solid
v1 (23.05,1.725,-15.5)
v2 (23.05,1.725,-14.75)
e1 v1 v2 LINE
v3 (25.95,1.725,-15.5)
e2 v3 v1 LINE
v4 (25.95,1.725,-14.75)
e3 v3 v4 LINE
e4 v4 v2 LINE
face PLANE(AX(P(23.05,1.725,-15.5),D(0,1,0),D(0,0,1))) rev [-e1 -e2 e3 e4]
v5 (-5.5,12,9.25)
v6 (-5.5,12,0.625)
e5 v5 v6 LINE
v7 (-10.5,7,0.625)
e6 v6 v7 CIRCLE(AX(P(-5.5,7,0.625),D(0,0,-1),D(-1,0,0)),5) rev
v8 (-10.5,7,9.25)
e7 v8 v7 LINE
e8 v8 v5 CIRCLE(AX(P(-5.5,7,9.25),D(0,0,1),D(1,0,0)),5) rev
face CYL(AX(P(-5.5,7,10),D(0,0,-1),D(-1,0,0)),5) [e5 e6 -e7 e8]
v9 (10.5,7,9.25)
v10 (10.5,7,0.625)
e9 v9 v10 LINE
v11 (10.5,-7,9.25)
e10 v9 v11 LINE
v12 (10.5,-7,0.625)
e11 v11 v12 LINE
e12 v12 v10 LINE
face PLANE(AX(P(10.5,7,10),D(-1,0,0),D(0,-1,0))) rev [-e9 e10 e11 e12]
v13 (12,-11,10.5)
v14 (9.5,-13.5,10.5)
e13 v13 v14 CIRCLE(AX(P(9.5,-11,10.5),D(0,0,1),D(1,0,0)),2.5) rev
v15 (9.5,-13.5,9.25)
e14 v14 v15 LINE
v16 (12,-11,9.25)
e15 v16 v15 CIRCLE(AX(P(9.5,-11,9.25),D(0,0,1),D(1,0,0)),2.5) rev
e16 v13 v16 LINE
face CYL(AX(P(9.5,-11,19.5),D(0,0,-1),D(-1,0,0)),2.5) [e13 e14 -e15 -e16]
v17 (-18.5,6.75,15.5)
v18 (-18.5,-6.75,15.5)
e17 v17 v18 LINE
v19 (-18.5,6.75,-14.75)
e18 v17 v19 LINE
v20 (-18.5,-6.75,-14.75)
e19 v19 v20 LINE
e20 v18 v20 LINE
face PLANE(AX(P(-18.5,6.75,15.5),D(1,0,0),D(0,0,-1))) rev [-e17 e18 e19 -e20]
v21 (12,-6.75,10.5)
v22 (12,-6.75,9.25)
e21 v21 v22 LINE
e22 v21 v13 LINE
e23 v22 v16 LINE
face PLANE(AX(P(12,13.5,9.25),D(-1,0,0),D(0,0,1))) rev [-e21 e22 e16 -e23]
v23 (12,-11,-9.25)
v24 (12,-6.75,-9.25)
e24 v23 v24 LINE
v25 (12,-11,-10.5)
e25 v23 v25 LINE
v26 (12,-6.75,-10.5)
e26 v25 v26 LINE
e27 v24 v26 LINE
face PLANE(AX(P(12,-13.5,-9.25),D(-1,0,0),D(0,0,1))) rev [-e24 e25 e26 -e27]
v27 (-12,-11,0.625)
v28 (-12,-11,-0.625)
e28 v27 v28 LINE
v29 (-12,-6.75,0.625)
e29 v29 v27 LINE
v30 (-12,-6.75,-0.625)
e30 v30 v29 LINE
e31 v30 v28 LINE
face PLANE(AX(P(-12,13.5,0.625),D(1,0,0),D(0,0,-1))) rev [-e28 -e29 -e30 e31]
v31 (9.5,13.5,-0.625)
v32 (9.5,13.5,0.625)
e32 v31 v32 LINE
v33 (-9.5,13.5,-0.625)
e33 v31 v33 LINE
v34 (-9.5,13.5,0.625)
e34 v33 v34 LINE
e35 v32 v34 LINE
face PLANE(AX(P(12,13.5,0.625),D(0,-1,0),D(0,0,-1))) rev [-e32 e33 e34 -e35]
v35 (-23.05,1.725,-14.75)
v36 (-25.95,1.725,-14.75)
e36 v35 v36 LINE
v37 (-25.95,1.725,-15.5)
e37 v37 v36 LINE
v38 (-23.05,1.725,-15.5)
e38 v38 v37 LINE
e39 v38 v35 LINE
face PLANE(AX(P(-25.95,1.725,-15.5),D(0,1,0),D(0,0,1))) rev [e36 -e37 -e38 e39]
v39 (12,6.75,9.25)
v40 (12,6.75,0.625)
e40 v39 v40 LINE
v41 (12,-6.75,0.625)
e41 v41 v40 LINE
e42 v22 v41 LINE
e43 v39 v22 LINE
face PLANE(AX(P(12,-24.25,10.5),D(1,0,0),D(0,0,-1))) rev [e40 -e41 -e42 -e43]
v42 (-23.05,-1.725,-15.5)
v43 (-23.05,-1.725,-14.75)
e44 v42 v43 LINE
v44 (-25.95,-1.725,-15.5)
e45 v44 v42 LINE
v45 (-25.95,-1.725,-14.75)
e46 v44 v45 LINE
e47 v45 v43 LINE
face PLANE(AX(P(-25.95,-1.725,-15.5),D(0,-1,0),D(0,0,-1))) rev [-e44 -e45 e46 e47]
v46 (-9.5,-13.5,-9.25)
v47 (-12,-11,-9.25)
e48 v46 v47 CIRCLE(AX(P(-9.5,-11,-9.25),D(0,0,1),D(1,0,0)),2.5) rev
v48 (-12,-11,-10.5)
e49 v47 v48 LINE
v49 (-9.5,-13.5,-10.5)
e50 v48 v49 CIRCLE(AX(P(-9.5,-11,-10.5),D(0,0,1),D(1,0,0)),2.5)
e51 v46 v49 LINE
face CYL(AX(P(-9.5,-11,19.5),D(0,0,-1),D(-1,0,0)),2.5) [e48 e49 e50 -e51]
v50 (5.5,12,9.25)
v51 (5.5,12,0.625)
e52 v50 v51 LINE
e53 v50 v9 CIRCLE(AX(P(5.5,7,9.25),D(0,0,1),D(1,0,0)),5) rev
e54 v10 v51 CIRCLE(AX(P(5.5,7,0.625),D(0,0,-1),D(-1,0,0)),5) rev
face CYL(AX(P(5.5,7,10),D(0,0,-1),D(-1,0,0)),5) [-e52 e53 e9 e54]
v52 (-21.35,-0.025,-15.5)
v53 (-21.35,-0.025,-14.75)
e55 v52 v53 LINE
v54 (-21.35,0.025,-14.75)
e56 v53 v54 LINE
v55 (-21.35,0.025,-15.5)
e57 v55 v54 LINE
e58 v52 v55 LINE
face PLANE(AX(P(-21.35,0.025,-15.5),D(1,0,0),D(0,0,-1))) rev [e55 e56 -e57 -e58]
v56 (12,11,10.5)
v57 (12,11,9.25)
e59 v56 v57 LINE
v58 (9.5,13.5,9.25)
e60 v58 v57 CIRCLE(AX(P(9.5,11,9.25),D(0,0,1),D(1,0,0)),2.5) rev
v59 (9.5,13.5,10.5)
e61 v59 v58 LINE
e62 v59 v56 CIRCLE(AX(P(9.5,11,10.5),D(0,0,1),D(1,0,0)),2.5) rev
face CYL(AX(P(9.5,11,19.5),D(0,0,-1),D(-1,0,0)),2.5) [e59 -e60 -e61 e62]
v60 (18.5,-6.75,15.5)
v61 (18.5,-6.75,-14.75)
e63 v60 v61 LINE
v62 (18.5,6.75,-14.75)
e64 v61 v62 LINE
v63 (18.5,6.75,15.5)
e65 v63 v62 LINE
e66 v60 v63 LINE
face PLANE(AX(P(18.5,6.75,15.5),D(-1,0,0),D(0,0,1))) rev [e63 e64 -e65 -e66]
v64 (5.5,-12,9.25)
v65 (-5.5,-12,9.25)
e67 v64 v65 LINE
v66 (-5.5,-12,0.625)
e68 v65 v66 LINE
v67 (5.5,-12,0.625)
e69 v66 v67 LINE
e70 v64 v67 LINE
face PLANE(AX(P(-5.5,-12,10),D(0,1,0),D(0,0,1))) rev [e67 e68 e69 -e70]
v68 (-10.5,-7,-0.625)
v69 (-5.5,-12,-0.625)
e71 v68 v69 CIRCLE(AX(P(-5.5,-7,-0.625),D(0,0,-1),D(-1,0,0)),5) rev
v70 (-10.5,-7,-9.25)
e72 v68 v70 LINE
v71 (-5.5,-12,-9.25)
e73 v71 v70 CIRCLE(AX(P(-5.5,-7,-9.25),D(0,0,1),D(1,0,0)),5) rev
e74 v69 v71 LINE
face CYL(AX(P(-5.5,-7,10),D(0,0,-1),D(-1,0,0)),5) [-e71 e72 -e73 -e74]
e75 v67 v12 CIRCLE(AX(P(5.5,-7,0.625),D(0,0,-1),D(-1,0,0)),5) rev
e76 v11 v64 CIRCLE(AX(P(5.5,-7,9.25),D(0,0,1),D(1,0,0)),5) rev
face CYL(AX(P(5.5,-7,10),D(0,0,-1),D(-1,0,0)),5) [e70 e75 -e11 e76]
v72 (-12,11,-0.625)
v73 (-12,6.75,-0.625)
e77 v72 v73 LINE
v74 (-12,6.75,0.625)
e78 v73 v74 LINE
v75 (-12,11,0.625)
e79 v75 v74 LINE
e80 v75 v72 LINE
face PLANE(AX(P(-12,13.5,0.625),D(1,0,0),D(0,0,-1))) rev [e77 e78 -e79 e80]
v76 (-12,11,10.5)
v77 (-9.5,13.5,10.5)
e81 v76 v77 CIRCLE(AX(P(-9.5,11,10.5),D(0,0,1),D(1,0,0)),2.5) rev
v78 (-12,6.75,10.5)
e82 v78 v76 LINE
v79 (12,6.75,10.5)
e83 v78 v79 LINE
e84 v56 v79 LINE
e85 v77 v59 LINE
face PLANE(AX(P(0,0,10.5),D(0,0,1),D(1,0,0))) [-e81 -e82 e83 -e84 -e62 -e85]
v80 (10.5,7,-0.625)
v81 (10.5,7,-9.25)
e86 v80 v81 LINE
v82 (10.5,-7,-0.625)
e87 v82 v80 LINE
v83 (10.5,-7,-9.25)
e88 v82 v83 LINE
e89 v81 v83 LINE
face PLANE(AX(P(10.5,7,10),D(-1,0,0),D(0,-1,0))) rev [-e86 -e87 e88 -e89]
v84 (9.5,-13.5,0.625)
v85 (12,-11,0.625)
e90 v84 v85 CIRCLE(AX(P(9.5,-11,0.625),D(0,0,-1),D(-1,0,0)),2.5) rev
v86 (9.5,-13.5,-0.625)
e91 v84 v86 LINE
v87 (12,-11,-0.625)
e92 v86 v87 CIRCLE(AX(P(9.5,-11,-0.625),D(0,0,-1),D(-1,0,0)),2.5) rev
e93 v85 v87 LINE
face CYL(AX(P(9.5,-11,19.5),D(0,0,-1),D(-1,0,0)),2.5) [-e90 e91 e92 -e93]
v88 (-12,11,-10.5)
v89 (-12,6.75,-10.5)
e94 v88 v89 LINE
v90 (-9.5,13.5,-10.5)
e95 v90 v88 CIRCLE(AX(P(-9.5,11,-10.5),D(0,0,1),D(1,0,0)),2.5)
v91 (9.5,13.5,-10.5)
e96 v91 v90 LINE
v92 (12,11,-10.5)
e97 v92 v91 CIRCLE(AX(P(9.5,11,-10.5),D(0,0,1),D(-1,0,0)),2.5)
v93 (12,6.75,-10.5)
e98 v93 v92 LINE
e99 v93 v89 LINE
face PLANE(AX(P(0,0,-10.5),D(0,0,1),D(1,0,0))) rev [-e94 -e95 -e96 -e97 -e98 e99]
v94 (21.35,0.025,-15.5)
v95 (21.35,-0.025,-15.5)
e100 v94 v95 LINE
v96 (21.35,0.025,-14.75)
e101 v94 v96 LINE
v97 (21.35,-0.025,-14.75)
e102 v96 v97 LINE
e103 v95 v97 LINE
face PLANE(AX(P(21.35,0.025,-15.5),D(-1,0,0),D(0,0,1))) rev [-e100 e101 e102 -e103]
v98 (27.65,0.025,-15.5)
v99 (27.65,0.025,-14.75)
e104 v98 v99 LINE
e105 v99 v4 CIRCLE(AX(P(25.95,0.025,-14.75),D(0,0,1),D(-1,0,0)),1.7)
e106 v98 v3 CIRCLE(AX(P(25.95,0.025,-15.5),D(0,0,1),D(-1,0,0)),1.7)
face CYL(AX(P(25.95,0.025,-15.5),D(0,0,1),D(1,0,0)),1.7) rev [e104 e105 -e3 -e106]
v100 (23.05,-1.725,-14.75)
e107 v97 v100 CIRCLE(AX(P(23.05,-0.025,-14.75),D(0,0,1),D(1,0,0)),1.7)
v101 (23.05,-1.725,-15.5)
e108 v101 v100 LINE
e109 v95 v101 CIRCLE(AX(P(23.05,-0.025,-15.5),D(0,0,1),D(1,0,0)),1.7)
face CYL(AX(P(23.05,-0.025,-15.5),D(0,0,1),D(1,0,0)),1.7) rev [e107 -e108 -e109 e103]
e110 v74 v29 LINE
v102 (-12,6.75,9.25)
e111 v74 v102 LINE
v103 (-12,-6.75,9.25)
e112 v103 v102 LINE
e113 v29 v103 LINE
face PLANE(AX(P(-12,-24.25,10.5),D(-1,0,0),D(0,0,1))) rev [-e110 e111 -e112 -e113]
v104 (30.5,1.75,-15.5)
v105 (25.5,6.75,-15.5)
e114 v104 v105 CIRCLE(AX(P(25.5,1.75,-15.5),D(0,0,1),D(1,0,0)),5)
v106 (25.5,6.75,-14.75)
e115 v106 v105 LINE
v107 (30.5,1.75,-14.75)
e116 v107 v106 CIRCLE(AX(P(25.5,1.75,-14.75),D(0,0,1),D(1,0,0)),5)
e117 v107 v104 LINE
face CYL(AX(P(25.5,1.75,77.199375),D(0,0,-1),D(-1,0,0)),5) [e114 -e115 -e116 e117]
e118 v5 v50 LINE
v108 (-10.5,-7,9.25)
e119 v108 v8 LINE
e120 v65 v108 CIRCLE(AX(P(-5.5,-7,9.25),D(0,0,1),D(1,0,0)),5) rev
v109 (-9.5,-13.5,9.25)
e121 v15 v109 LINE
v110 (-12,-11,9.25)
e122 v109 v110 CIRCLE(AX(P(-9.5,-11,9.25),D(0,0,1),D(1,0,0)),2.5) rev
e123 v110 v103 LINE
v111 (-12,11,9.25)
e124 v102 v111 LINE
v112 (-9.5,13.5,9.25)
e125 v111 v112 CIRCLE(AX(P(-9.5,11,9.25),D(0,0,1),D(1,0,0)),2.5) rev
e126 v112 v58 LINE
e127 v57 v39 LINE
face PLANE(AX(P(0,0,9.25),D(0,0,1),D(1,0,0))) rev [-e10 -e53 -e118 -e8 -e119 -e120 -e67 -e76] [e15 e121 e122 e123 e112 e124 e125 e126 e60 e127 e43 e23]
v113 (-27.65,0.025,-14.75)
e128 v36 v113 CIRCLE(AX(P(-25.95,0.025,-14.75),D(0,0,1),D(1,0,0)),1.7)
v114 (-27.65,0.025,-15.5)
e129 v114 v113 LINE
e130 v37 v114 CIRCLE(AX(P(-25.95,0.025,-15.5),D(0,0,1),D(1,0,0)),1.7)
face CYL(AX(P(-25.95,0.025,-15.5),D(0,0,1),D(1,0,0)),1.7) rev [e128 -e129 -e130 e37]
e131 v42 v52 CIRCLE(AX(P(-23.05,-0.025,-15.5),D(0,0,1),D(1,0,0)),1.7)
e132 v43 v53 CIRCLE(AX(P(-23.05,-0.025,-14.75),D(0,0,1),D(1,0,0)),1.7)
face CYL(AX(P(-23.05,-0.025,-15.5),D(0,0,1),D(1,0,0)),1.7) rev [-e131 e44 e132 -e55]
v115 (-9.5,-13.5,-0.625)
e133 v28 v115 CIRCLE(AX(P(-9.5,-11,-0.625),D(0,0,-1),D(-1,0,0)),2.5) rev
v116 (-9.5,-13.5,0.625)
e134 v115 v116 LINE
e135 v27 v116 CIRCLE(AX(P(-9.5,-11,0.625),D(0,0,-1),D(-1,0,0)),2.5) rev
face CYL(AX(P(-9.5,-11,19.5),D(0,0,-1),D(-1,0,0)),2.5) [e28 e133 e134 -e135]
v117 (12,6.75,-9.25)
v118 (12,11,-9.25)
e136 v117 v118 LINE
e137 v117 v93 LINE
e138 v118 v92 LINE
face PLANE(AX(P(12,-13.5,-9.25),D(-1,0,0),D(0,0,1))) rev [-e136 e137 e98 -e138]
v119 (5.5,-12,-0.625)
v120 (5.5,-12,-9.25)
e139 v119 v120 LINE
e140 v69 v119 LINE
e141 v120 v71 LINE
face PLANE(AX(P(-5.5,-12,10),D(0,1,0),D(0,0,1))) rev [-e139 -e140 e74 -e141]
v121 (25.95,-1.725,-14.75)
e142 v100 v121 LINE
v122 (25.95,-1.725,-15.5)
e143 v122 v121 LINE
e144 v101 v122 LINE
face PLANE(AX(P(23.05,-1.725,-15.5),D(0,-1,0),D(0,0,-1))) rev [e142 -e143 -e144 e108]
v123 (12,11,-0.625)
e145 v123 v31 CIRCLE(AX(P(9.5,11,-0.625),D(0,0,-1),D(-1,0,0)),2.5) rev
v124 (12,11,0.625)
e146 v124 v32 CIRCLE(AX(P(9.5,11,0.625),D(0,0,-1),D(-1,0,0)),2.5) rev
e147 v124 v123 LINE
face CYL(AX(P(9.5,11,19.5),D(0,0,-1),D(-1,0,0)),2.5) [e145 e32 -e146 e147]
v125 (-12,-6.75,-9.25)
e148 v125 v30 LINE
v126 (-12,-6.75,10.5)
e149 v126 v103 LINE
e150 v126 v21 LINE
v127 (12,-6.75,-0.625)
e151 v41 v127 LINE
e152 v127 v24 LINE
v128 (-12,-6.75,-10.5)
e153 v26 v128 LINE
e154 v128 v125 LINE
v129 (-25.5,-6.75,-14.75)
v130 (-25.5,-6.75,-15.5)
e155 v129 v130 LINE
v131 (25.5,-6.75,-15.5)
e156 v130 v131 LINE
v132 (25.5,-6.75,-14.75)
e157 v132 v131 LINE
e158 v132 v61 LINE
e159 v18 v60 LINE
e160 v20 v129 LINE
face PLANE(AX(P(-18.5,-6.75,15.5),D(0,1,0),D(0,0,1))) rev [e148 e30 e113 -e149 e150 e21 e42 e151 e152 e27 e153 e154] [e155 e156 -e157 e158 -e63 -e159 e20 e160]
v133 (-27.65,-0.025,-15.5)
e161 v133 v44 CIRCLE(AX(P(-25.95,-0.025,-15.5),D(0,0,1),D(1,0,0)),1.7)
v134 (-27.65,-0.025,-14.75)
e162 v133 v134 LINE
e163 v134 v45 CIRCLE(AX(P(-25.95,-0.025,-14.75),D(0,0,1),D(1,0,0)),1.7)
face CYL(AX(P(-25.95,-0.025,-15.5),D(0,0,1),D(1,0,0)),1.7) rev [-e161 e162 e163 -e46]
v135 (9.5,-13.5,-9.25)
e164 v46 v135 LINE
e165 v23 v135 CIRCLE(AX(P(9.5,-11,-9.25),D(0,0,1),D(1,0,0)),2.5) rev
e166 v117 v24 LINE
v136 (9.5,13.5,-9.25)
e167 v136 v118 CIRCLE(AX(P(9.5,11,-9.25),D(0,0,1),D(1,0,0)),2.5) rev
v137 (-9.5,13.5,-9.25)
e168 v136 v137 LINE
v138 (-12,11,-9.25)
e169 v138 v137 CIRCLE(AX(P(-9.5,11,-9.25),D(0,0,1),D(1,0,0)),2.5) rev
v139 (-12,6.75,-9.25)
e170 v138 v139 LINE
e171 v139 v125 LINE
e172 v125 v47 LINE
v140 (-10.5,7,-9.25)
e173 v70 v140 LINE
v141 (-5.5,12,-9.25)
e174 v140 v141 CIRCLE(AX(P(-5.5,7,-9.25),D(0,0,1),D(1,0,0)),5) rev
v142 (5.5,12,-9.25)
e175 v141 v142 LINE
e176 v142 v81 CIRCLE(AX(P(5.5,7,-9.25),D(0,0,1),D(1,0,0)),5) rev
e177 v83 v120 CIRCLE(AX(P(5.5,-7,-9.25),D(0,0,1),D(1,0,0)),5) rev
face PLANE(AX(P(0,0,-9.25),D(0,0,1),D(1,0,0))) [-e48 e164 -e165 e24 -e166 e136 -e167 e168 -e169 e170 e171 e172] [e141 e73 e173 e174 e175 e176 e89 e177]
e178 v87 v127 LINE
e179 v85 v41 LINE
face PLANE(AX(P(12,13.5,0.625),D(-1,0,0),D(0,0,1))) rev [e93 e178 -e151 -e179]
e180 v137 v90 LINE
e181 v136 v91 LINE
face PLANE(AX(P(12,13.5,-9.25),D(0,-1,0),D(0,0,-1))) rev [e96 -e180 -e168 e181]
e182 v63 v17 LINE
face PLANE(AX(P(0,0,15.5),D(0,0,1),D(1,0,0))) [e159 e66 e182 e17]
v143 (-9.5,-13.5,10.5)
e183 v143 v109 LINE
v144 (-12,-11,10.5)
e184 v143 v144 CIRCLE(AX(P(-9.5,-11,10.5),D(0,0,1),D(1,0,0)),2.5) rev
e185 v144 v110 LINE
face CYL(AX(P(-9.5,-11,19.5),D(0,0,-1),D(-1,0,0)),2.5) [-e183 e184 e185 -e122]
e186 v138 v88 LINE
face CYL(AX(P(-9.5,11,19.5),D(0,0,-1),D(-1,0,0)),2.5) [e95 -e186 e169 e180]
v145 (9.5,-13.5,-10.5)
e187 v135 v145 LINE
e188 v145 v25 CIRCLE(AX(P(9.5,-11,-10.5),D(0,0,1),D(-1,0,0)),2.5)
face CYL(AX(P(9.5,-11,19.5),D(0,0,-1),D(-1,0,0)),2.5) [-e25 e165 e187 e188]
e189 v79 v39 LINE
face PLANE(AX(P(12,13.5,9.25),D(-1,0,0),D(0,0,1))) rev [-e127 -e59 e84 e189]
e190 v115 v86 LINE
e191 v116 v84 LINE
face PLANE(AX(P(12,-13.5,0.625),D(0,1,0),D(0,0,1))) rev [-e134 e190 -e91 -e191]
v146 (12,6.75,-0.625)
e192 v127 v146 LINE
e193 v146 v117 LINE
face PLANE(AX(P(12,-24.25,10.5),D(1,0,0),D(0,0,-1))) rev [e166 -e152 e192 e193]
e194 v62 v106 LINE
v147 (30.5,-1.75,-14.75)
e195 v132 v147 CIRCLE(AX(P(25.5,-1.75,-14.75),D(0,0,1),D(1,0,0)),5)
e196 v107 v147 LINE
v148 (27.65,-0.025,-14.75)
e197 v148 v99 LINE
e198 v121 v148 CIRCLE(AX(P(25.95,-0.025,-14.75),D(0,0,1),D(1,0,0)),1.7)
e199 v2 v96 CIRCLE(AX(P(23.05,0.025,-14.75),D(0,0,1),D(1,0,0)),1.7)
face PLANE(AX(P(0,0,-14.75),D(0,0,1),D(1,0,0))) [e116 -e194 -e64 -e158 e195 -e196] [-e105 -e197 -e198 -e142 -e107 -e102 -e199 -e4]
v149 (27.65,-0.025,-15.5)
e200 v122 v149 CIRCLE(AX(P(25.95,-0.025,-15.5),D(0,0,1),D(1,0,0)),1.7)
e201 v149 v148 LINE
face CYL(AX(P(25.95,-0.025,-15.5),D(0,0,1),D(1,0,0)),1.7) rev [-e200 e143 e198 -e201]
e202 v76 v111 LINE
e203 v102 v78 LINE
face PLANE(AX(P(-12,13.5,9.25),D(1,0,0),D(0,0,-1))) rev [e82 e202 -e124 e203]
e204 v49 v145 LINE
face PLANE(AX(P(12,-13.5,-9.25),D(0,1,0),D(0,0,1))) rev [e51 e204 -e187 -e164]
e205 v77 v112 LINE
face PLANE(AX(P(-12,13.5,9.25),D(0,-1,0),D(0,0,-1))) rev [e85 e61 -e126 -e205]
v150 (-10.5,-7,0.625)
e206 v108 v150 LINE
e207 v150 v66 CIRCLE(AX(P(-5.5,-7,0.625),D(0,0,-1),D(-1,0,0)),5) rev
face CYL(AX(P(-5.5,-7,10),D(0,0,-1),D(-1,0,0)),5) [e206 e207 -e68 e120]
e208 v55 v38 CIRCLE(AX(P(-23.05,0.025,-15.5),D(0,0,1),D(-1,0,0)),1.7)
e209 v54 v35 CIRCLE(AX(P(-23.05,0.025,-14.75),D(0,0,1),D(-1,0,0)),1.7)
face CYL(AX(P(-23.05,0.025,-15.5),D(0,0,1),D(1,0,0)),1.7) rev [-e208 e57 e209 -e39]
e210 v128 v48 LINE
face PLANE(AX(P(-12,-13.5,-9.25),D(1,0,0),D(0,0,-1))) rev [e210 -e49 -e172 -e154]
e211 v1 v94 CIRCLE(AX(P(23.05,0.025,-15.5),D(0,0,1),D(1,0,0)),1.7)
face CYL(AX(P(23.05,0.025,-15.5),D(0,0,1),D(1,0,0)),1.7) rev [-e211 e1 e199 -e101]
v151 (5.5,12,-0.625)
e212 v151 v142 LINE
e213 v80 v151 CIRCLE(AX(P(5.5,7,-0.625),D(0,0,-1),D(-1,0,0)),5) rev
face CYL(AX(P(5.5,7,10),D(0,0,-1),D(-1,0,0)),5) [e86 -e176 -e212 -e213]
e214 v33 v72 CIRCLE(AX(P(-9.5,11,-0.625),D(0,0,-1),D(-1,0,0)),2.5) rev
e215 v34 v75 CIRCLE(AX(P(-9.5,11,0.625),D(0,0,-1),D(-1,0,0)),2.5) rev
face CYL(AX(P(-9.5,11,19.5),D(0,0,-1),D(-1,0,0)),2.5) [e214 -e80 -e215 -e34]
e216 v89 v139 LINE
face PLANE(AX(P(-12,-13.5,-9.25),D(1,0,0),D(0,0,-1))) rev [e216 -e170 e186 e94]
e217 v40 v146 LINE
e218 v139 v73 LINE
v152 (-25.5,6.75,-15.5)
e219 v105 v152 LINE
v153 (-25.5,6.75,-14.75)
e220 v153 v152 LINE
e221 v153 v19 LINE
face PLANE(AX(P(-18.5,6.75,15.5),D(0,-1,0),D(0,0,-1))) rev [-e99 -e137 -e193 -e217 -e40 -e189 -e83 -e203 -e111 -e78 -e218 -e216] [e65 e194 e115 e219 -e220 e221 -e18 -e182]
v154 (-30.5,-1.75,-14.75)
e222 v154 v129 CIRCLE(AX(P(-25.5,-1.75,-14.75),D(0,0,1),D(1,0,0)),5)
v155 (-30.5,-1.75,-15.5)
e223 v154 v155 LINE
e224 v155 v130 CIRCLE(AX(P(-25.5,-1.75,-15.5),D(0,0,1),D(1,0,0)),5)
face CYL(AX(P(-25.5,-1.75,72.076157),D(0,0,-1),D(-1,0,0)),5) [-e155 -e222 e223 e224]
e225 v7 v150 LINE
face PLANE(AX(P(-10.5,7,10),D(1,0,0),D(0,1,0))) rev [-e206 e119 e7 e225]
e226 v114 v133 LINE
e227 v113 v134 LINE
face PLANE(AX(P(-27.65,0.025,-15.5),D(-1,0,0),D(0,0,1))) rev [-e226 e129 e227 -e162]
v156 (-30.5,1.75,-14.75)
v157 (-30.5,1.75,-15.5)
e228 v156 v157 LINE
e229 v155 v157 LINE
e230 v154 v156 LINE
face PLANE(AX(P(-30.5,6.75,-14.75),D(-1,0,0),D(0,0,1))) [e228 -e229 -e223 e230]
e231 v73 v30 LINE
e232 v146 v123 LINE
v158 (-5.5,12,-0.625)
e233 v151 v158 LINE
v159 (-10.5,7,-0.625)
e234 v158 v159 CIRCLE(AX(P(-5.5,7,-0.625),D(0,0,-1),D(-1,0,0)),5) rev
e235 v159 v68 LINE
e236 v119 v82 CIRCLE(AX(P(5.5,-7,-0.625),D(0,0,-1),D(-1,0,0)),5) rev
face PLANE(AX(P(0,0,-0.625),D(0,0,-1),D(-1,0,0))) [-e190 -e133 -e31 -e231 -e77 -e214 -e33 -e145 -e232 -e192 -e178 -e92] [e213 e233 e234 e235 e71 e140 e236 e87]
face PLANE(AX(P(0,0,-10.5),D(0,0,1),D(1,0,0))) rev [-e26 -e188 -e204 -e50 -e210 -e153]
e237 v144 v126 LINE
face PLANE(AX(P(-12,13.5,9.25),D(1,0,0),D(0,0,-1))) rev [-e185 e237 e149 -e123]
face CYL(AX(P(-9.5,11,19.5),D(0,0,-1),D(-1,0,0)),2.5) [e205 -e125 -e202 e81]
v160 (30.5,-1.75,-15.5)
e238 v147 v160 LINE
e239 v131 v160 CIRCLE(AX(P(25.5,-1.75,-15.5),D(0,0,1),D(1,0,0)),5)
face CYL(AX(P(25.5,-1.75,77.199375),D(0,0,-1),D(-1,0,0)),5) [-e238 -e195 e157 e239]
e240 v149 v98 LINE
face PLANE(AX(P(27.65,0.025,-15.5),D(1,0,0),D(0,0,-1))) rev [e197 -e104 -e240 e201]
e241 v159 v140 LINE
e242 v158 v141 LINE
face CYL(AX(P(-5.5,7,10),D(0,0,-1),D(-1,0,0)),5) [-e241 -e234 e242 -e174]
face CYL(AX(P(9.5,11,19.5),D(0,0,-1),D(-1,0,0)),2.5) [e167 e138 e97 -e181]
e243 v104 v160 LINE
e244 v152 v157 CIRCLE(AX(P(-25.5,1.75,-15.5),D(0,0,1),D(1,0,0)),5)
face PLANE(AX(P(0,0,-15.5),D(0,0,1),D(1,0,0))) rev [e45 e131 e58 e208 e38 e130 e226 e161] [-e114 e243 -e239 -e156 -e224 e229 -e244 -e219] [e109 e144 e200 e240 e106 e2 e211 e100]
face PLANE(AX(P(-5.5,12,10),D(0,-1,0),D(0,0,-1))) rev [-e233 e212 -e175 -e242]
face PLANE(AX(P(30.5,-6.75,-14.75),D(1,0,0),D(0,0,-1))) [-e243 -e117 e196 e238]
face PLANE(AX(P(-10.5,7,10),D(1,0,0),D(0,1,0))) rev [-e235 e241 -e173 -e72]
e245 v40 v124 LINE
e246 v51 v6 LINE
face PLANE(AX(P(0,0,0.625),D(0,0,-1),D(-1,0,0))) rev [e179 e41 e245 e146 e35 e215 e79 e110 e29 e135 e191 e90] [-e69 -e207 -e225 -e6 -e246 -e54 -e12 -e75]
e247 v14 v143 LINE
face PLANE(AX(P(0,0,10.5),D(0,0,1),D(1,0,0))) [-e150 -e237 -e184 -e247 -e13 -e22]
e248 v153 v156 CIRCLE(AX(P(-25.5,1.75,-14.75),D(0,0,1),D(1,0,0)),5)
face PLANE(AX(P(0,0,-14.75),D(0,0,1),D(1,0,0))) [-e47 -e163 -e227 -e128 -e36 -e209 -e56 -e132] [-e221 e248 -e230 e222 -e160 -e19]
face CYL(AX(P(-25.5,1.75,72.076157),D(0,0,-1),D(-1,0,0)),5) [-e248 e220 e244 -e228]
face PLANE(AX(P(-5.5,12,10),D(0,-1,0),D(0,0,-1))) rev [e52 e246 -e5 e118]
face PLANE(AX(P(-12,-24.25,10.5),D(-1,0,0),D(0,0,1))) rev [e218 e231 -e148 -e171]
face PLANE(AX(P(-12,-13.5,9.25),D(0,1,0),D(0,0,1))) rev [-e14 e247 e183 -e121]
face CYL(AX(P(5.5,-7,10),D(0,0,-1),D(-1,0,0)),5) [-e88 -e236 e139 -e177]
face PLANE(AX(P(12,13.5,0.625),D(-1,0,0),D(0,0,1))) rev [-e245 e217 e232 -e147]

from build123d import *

# Parameters (mm, degrees)
SKETCH1_W           = 37
SKETCH1_H           = 13.5
BOSS_EXTRUDE1_DEPTH = 15.5
SKETCH2_W           = 24
SKETCH2_H           = 21
CUT_EXTRUDE1_DEPTH  = 31
SKETCH3_W           = 24
SKETCH3_H           = 27
BOSS_EXTRUDE2_DEPTH = 1.25
SKETCH4_W           = 24
SKETCH4_H           = 27
BOSS_EXTRUDE3_DEPTH = 1.25
SKETCH5_W           = 24
SKETCH5_H           = 27
BOSS_EXTRUDE4_DEPTH = 0.625
CUT_EXTRUDE2_DEPTH  = 30
CUT_EXTRUDE3_DEPTH  = 30
BOSS_EXTRUDE5_DEPTH = 10
SKETCH9_W           = 13.5
SKETCH9_H           = 12
BOSS_EXTRUDE6_DEPTH = 0.75
CUT_EXTRUDE6_START  = -0.75
CUT_EXTRUDE6_DEPTH  = 0.75
CUT_EXTRUDE7_DEPTH  = 0.75
SKETCH15_W          = 13.5
SKETCH15_H          = 12
BOSS_EXTRUDE7_DEPTH = 0.75
CUT_EXTRUDE8_START  = -0.75
CUT_EXTRUDE8_DEPTH  = 0.75
CUT_EXTRUDE9_DEPTH  = 0.75


# Read off the part's stored shape, not the designer's step: Cut-Extrude6, Cut-Extrude8
with BuildPart() as part:
    # Sketch1 → Boss-Extrude1 (new, symmetric)
    with BuildSketch(Plane.XY):
        Rectangle(SKETCH1_W, SKETCH1_H)
    extrude(amount=BOSS_EXTRUDE1_DEPTH, both=True)

    # Sketch2 → Cut-Extrude1 (cut)
    with BuildSketch(Plane(origin=(0, 6.75, 0), x_dir=(1, 0, 0), z_dir=(0, 1, 0))):
        Rectangle(SKETCH2_W, SKETCH2_H)
    extrude(amount=-CUT_EXTRUDE1_DEPTH, mode=Mode.SUBTRACT)

    # Sketch3 → Boss-Extrude2 (add)
    with BuildSketch(Plane.XY.offset(-10.5)):
        Rectangle(SKETCH3_W, SKETCH3_H)
    extrude(amount=BOSS_EXTRUDE2_DEPTH)

    # Sketch4 → Boss-Extrude3 (add)
    with BuildSketch(Plane(origin=(0, 0, 10.5), x_dir=(-1, 0, 0), z_dir=(0, 0, -1))):
        Rectangle(SKETCH4_W, SKETCH4_H)
    extrude(amount=BOSS_EXTRUDE3_DEPTH)

    # Sketch5 → Boss-Extrude4 (add, symmetric)
    with BuildSketch(Plane.XY):
        Rectangle(SKETCH5_W, SKETCH5_H)
    extrude(amount=BOSS_EXTRUDE4_DEPTH, both=True)

    # Sketch6 → Cut-Extrude2 (cut)
    with BuildSketch(Plane(origin=(0, 0, -10.5), x_dir=(-1, 0, 0), z_dir=(0, 0, -1))):
        with BuildLine():
            Line((-12, -13.5), (-12, -11))
            ThreePointArc((-12, -11), (-11.267766953, -12.767766953), (-9.5, -13.5))
            Line((-9.5, -13.5), (-12, -13.5))
        make_face()
        with BuildLine():
            Line((12, -13.5), (12, -11))
            ThreePointArc((12, -11), (11.267766953, -12.767766953), (9.5, -13.5))
            Line((9.5, -13.5), (12, -13.5))
        make_face()
    extrude(amount=-CUT_EXTRUDE2_DEPTH, mode=Mode.SUBTRACT)

    # Sketch7 → Cut-Extrude3 (cut)
    with BuildSketch(Plane(origin=(0, 0, -10.5), x_dir=(-1, 0, 0), z_dir=(0, 0, -1))):
        with BuildLine():
            Line((12, 13.5), (9.5, 13.5))
            ThreePointArc((9.5, 13.5), (11.267766953, 12.767766953), (12, 11))
            Line((12, 11), (12, 13.5))
        make_face()
        with BuildLine():
            Line((-12, 13.5), (-12, 11))
            ThreePointArc((-12, 11), (-11.267766953, 12.767766953), (-9.5, 13.5))
            Line((-9.5, 13.5), (-12, 13.5))
        make_face()
    extrude(amount=-CUT_EXTRUDE3_DEPTH, mode=Mode.SUBTRACT)

    # Sketch8 → Boss-Extrude5 (add, symmetric)
    with BuildSketch(Plane.XY):
        with BuildLine():
            Line((-5.5, 12), (5.5, 12))
            ThreePointArc((5.5, 12), (9.035533906, 10.535533906), (10.5, 7))
            Line((10.5, 7), (10.5, -7))
            ThreePointArc((10.5, -7), (9.035533906, -10.535533906), (5.5, -12))
            Line((5.5, -12), (-5.5, -12))
            ThreePointArc((-5.5, -12), (-9.035533906, -10.535533906), (-10.5, -7))
            Line((-10.5, -7), (-10.5, 7))
            ThreePointArc((-10.5, 7), (-9.035533906, 10.535533906), (-5.5, 12))
        make_face()
    extrude(amount=BOSS_EXTRUDE5_DEPTH, both=True)

    # Sketch9 → Boss-Extrude6 (add)
    with BuildSketch(Plane(origin=(0, 0, -15.5), x_dir=(0, -1, 0), z_dir=(0, 0, -1))):
        with Locations((0, 24.5)):
            Rectangle(SKETCH9_W, SKETCH9_H)
    extrude(amount=-BOSS_EXTRUDE6_DEPTH)

    # Cut-Extrude6 outline → Cut-Extrude6 (cut)
    with BuildSketch(Plane.XY.offset(-14.75).offset(CUT_EXTRUDE6_START)):
        with BuildLine():
            Line((-30.5, 6.75), (-30.5, 1.75))
            ThreePointArc((-30.5, 1.75), (-29.035533906, 5.285533906), (-25.5, 6.75))
            Line((-25.5, 6.75), (-30.5, 6.75))
        make_face()
        with BuildLine():
            ThreePointArc((-25.5, -6.75), (-29.035533906, -5.285533906), (-30.5, -1.75))
            Line((-30.5, -1.75), (-30.5, -6.75))
            Line((-30.5, -6.75), (-25.5, -6.75))
        make_face()
    extrude(amount=CUT_EXTRUDE6_DEPTH, mode=Mode.SUBTRACT)

    # Sketch14 → Cut-Extrude7 (cut)
    with BuildSketch(Plane.XY.offset(-14.75)):
        with BuildLine():
            Line((-25.95, 1.725), (-23.05, 1.725))
            ThreePointArc((-23.05, 1.725), (-21.847918472, 1.227081528), (-21.35, 0.025))
            Line((-21.35, 0.025), (-21.35, -0.025))
            ThreePointArc((-21.35, -0.025), (-21.847918472, -1.227081528), (-23.05, -1.725))
            Line((-23.05, -1.725), (-25.95, -1.725))
            ThreePointArc((-25.95, -1.725), (-27.152081528, -1.227081528), (-27.65, -0.025))
            Line((-27.65, -0.025), (-27.65, 0.025))
            ThreePointArc((-27.65, 0.025), (-27.152081528, 1.227081528), (-25.95, 1.725))
        make_face()
    extrude(amount=-CUT_EXTRUDE7_DEPTH, mode=Mode.SUBTRACT)

    # Sketch15 → Boss-Extrude7 (add)
    with BuildSketch(Plane.YX.offset(15.5)):
        with Locations((0, 24.5)):
            Rectangle(SKETCH15_W, SKETCH15_H)
    extrude(amount=-BOSS_EXTRUDE7_DEPTH)

    # Cut-Extrude8 outline → Cut-Extrude8 (cut)
    with BuildSketch(Plane.XY.offset(-14.75).offset(CUT_EXTRUDE8_START)):
        with BuildLine():
            Line((30.5, -6.75), (30.5, -1.75))
            ThreePointArc((30.5, -1.75), (29.035533906, -5.285533906), (25.5, -6.75))
            Line((25.5, -6.75), (30.5, -6.75))
        make_face()
        with BuildLine():
            ThreePointArc((25.5, 6.75), (29.035533906, 5.285533906), (30.5, 1.75))
            Line((30.5, 1.75), (30.5, 6.75))
            Line((30.5, 6.75), (25.5, 6.75))
        make_face()
    extrude(amount=CUT_EXTRUDE8_DEPTH, mode=Mode.SUBTRACT)

    # Sketch18 → Cut-Extrude9 (cut)
    with BuildSketch(Plane.XY.offset(-14.75)):
        with BuildLine():
            Line((23.05, 1.725), (25.95, 1.725))
            ThreePointArc((25.95, 1.725), (27.152081528, 1.227081528), (27.65, 0.025))
            Line((27.65, 0.025), (27.65, -0.025))
            ThreePointArc((27.65, -0.025), (27.152081528, -1.227081528), (25.95, -1.725))
            Line((25.95, -1.725), (23.05, -1.725))
            ThreePointArc((23.05, -1.725), (21.847918472, -1.227081528), (21.35, -0.025))
            Line((21.35, -0.025), (21.35, 0.025))
            ThreePointArc((21.35, 0.025), (21.847918472, 1.227081528), (23.05, 1.725))
        make_face()
    extrude(amount=-CUT_EXTRUDE9_DEPTH, mode=Mode.SUBTRACT)


solid = part.part
